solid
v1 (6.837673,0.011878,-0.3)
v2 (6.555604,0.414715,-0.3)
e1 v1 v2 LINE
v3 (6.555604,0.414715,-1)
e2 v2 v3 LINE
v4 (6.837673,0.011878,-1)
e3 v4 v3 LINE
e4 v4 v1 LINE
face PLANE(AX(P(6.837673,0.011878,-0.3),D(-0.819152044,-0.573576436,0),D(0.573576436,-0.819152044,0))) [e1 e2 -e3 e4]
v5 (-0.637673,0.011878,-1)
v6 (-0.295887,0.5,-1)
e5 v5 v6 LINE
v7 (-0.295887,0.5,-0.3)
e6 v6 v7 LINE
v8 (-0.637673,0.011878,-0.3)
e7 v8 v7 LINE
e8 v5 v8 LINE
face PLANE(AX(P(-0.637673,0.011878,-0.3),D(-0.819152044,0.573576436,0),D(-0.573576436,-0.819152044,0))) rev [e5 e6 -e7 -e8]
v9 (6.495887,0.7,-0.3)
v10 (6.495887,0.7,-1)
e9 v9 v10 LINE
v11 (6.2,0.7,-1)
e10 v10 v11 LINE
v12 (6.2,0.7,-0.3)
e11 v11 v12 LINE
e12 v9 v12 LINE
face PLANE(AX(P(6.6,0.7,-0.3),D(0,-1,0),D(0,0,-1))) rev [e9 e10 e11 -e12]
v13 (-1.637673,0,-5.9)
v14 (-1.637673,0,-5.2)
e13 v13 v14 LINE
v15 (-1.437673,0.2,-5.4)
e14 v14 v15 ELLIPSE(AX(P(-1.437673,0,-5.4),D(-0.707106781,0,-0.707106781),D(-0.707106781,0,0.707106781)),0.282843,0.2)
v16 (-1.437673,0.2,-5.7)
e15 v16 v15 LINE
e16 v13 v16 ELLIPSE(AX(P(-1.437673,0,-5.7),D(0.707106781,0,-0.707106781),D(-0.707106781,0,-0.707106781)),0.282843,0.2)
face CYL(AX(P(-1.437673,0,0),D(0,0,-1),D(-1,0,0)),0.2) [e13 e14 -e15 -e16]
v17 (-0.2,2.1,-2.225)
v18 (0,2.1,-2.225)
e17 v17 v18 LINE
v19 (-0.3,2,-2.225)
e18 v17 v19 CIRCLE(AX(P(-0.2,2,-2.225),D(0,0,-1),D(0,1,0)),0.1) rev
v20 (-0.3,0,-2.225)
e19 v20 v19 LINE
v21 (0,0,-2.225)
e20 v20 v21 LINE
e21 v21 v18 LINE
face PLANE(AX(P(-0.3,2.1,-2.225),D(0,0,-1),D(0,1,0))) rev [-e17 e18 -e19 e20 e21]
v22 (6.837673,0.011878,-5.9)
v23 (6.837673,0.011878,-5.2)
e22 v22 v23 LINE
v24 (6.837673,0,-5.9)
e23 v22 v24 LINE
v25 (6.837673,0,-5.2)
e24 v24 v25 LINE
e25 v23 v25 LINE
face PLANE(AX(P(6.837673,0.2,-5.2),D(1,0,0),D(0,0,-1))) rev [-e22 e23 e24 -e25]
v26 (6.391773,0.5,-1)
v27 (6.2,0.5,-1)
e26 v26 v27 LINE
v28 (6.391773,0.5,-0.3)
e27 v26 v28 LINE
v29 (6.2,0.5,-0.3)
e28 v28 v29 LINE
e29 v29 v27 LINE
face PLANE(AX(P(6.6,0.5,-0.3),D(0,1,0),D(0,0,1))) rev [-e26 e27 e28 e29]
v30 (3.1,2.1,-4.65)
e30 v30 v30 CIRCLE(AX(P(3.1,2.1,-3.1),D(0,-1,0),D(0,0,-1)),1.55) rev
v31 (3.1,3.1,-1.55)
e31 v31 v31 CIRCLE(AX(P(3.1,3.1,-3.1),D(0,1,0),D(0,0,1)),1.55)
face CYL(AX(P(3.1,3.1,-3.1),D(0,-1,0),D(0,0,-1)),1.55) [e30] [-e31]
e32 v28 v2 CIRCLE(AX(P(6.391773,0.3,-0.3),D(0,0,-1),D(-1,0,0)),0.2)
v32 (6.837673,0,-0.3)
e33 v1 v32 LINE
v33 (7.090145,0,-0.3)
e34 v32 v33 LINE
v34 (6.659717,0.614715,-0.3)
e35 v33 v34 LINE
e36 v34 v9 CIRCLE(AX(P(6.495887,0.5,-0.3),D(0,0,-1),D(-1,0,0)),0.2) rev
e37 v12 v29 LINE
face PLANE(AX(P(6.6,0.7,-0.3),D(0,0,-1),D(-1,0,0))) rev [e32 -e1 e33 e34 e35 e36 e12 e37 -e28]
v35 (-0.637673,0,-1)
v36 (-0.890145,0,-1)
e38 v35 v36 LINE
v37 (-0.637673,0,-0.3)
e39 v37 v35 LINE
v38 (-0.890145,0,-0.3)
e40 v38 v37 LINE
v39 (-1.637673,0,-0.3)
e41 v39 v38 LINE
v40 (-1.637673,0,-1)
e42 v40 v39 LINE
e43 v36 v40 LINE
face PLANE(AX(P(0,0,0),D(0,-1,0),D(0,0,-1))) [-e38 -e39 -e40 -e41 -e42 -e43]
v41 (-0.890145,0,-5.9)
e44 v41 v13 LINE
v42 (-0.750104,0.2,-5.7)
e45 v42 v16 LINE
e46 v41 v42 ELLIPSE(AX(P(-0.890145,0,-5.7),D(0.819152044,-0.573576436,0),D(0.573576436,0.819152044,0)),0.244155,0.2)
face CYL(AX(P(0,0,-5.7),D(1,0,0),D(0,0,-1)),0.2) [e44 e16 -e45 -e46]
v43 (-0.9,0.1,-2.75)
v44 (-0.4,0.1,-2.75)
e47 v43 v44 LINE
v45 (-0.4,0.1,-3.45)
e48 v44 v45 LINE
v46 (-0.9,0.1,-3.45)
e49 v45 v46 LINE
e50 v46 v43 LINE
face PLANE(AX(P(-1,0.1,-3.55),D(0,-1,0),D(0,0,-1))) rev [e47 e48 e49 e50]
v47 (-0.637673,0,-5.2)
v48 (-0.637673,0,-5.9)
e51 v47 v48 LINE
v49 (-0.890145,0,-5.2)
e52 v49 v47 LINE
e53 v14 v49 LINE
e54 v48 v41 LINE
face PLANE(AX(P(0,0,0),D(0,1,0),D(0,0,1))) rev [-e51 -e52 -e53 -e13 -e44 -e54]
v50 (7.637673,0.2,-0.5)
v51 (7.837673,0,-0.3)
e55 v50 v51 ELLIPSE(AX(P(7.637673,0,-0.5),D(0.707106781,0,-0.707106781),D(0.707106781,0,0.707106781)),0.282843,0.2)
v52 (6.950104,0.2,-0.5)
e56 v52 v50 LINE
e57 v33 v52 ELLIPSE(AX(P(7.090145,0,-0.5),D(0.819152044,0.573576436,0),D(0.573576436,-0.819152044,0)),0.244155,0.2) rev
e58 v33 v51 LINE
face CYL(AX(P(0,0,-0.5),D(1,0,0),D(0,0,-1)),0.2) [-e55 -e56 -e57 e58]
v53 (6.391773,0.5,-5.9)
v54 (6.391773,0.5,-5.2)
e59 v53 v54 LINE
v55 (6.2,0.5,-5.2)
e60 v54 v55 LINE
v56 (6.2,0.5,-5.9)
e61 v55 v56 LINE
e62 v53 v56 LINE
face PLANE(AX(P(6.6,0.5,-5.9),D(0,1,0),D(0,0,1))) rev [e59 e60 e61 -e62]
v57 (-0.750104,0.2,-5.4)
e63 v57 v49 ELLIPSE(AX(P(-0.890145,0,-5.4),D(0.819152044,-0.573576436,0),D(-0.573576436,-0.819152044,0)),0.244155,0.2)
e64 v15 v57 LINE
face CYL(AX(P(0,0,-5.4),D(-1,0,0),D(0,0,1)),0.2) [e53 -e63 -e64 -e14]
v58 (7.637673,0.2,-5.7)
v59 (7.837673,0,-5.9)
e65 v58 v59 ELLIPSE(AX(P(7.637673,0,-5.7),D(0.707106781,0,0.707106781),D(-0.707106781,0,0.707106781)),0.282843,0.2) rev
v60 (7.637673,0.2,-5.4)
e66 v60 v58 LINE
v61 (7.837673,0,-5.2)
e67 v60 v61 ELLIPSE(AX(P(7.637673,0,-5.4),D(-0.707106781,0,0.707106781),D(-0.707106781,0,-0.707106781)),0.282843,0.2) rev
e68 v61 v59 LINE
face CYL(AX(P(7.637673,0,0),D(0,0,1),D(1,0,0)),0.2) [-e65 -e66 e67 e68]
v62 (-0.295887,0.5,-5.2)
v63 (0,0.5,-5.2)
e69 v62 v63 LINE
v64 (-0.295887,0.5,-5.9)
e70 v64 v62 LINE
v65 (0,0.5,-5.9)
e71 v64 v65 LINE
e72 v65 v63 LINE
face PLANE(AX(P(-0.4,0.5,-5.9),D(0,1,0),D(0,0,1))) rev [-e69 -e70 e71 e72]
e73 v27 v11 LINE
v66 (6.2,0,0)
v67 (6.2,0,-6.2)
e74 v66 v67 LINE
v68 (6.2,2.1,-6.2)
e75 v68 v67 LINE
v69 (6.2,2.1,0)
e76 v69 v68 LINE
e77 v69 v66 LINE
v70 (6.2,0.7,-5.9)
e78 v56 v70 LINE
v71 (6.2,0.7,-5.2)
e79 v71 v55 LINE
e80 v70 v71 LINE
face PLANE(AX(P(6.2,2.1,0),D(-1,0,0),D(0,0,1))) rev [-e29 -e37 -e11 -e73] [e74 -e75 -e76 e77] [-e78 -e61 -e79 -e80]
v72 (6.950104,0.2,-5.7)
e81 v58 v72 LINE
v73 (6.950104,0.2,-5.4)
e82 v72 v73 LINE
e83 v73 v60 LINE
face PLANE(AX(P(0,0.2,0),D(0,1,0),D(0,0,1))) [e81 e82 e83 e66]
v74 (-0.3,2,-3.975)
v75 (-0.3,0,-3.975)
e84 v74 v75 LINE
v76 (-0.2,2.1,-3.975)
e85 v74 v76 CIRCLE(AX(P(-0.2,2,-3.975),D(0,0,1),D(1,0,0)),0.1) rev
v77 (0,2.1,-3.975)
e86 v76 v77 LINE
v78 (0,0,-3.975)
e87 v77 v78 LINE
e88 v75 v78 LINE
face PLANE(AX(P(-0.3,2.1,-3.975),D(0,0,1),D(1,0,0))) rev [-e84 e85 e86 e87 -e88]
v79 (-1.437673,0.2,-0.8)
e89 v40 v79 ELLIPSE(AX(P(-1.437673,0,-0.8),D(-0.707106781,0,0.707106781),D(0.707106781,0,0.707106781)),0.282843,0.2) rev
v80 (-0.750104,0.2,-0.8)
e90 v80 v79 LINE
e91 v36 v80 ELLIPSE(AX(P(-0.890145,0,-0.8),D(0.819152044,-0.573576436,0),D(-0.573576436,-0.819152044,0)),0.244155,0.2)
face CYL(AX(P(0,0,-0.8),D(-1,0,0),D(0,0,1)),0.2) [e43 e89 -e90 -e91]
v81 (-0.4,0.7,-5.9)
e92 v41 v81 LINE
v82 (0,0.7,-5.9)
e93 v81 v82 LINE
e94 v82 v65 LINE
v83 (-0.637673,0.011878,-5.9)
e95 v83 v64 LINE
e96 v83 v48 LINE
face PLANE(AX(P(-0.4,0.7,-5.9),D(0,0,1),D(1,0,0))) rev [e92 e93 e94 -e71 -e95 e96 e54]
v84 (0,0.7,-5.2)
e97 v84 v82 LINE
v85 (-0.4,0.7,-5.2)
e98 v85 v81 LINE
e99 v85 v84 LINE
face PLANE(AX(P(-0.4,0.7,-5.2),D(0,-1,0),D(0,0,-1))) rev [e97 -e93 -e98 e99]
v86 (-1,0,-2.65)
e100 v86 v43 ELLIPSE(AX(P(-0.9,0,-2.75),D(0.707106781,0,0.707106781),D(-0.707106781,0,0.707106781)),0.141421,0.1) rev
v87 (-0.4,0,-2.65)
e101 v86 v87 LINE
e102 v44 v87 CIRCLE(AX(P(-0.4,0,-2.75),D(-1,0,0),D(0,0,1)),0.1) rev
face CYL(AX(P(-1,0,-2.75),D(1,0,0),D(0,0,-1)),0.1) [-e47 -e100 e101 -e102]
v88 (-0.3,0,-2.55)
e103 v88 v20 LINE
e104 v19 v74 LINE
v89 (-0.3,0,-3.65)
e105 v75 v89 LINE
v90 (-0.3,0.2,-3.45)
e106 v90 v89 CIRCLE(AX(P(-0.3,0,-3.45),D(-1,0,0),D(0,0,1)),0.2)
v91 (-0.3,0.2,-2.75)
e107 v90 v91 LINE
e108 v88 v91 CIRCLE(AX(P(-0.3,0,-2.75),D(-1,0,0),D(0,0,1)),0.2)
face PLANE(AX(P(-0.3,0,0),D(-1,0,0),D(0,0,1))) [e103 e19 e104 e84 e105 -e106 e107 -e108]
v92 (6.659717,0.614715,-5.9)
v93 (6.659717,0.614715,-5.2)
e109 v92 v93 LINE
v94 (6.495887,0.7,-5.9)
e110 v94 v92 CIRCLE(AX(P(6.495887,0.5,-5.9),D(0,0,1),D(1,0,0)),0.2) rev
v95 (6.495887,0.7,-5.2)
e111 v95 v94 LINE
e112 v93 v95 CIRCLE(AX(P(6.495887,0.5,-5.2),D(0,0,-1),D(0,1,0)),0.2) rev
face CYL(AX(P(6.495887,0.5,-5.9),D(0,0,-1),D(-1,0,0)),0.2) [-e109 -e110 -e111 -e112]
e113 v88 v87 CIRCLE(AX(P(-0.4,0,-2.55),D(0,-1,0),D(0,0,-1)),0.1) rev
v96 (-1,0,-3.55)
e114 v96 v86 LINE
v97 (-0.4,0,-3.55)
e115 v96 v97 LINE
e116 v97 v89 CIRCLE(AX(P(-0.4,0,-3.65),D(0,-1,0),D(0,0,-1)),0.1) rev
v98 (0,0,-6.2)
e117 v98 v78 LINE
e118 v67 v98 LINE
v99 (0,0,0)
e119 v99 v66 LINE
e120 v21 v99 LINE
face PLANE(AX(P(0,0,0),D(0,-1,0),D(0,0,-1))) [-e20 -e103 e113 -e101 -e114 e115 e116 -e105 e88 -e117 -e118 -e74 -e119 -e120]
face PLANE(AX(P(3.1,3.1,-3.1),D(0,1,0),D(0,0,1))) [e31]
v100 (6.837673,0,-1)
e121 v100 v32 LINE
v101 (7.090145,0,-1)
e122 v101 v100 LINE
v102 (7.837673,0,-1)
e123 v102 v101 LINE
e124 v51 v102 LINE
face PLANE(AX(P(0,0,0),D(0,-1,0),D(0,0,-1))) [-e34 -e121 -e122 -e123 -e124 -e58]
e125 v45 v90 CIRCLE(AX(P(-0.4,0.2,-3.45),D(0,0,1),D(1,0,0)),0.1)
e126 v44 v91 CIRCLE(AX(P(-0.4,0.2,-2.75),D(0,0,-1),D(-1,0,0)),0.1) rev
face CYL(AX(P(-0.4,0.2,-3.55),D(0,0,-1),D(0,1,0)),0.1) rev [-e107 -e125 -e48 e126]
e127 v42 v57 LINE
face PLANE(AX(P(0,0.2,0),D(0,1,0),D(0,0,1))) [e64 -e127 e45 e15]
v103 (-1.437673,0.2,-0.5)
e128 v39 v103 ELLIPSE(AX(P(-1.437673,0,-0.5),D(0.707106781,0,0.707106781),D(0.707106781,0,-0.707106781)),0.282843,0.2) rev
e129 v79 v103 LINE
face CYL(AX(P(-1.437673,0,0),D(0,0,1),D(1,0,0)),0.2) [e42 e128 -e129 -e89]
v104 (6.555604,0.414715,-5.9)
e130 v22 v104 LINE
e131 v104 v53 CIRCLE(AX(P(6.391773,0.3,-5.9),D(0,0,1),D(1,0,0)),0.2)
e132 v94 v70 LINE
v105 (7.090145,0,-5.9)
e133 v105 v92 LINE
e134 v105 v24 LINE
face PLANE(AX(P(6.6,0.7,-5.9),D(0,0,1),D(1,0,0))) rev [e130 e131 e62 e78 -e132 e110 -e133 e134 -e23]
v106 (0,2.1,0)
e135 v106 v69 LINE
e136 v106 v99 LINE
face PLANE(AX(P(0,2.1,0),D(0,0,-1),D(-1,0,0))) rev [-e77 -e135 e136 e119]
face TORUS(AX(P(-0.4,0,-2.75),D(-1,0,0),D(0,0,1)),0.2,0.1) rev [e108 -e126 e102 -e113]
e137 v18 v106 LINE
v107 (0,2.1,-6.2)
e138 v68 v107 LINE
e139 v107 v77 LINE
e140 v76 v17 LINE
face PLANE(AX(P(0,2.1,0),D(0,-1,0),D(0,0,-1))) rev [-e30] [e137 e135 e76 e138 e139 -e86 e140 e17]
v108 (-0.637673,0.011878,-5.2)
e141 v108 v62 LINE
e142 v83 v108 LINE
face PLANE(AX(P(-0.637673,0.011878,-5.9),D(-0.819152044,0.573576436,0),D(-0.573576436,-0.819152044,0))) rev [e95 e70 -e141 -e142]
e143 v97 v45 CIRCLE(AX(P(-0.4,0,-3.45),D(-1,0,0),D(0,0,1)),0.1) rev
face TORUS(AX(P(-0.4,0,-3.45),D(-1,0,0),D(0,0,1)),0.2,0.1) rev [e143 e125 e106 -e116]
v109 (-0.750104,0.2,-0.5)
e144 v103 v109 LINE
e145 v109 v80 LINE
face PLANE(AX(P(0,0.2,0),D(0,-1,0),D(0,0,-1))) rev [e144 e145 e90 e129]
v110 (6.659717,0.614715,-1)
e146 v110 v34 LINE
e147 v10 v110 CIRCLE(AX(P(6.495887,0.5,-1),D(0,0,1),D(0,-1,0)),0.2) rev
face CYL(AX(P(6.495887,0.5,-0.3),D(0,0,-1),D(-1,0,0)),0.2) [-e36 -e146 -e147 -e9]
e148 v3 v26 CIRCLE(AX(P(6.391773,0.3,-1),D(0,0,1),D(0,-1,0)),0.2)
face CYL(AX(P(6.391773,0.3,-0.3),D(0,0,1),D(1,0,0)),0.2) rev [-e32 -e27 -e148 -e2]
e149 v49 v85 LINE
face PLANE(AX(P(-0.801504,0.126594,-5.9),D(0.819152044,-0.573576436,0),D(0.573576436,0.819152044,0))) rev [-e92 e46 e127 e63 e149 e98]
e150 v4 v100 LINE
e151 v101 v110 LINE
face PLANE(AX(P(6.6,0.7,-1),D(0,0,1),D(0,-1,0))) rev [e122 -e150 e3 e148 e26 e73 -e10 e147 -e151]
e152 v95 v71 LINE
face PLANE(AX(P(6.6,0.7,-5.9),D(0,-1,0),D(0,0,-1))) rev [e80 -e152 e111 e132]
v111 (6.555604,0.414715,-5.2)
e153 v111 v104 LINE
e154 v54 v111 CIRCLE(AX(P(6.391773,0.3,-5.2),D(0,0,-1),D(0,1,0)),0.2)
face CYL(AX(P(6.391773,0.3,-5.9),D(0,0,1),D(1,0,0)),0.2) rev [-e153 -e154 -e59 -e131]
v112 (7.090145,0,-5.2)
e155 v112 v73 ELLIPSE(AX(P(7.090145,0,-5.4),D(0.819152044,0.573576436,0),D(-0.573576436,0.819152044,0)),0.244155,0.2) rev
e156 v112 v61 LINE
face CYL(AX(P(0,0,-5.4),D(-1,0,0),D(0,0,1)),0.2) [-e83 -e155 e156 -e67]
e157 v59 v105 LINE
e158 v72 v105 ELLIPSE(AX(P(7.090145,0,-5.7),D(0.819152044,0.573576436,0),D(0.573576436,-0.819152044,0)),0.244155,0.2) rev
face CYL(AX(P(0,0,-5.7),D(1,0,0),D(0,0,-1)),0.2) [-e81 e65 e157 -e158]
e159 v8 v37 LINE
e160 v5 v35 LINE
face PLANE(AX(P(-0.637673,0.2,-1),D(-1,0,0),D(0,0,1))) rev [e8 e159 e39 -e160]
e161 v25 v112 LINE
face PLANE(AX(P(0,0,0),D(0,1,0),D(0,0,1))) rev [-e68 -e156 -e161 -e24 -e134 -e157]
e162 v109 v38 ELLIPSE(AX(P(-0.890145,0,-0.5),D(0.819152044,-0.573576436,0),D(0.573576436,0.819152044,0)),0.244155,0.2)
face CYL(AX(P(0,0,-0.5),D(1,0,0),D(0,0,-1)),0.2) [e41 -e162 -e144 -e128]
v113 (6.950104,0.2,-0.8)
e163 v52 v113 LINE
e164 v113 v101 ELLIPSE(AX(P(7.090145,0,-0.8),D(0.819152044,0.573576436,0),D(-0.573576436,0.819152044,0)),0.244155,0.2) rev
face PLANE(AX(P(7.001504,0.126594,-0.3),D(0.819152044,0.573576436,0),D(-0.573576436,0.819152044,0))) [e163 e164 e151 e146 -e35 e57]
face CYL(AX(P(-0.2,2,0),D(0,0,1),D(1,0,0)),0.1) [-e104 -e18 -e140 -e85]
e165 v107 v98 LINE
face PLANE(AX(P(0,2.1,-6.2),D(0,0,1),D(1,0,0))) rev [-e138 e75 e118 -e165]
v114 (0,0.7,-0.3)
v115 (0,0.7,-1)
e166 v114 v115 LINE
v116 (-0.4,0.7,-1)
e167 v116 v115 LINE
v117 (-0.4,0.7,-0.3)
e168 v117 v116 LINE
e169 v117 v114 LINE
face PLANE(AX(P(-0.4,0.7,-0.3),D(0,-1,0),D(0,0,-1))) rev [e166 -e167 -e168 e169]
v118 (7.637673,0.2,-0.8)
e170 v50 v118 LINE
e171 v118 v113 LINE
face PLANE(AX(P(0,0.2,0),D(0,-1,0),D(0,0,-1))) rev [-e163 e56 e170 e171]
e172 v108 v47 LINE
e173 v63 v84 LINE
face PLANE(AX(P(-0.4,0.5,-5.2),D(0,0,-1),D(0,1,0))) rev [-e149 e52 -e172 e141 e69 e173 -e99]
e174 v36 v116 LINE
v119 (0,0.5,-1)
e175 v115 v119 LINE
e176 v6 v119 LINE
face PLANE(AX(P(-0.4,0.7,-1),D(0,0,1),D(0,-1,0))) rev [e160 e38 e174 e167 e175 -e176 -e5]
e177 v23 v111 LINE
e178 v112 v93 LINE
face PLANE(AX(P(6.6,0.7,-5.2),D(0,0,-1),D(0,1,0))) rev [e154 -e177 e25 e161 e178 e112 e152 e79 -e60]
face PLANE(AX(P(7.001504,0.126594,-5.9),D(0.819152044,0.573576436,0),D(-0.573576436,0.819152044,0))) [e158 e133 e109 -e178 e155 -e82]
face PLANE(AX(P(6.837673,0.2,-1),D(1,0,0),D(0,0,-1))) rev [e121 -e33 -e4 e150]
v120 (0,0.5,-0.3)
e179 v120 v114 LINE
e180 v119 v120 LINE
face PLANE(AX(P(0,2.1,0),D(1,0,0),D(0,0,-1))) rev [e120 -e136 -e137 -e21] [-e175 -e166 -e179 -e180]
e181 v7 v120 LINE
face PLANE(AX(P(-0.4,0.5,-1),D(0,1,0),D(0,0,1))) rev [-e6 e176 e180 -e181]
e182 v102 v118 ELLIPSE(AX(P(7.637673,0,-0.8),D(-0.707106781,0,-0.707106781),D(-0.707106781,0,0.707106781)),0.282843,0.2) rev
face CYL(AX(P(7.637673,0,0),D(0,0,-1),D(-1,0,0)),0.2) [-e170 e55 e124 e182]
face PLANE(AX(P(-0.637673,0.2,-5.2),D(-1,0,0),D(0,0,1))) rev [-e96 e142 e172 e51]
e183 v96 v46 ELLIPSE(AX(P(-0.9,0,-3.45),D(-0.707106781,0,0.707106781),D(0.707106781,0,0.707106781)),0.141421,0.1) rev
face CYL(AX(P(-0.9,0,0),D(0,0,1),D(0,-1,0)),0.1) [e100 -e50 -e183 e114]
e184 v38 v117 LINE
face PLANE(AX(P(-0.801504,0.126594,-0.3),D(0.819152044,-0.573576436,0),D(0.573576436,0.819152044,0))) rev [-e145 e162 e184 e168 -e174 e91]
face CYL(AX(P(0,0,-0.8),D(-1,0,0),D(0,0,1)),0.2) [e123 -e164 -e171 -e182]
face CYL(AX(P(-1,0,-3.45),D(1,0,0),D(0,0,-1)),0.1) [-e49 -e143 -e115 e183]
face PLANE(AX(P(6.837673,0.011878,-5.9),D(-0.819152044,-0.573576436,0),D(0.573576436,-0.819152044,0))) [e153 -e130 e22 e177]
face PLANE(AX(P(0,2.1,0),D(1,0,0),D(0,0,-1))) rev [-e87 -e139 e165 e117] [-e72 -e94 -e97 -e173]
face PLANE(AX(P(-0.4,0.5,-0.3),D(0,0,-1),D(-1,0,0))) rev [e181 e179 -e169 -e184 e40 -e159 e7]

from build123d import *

# Parameters (mm, degrees)
ESQUISSE1_W         = 6.2
ESQUISSE1_H         = 6.2
BOSS_EXTRU_1_DEPTH  = 2.1
ESQUISSE2_R         = 1.55
BOSS_EXTRU_2_DEPTH  = 1
ESQUISSE3_W         = 1.75
ESQUISSE3_H         = 2.1
BOSS_EXTRU_3_DEPTH  = 0.3
ESQUISSE4_W         = 0.9
ESQUISSE4_H         = 0.1
BOSS_EXTRU_4_DEPTH  = 0.7
CONG_1_R            = 0.1
ESQUISSE5_W         = 0.7
ESQUISSE5_H         = 0.2
BOSS_EXTRU_5_DEPTH  = 0.4
ESQUISSE7_W         = 0.7
ESQUISSE7_H         = 0.2
BOSS_EXTRU_6_DEPTH  = 0.7
CONG_2_R            = 0.2
ESQUISSE9_W         = 1
ESQUISSE9_H         = 0.7
BOSS_EXTRU_7_DEPTH  = 0.2
CONG_3_R            = 0.2
CONG_4_R            = 0.2
ESQUISSE10_W        = 0.7
ESQUISSE10_H        = 0.2
BOSS_EXTRU_10_DEPTH = 0.4
ESQUISSE14_W        = 0.7
ESQUISSE14_H        = 0.2
BOSS_EXTRU_11_DEPTH = 0.7
ESQUISSE16_W        = 1
ESQUISSE16_H        = 0.7
BOSS_EXTRU_12_DEPTH = 0.2
CONG_5_R            = 0.2


with BuildPart() as part:
    # Esquisse1 → Boss.-Extru.1 (new body)
    with BuildSketch(Plane(origin=(0, 0, 0), x_dir=(1, 0, 0), z_dir=(0, 1, 0))):
        with Locations((3.1, 3.1)):
            Rectangle(ESQUISSE1_W, ESQUISSE1_H)
    extrude(amount=BOSS_EXTRU_1_DEPTH)

    # Esquisse2 → Boss.-Extru.2 (add)
    with BuildSketch(Plane(origin=(0, 2.1, 0), x_dir=(1, 0, 0), z_dir=(0, 1, 0))):
        with Locations(Location((3.1, 3.1, 0), (0, 0, 90))):
            Circle(ESQUISSE2_R)
    extrude(amount=BOSS_EXTRU_2_DEPTH)

    # Esquisse3 → Boss.-Extru.3 (add)
    with BuildSketch(Plane.ZY):
        with Locations((-3.1, 1.05)):
            Rectangle(ESQUISSE3_W, ESQUISSE3_H)
    extrude(amount=BOSS_EXTRU_3_DEPTH)

    # Esquisse4 → Boss.-Extru.4 (add)
    with BuildSketch(Plane.ZY.offset(0.3)):
        with Locations((-3.1, 0.05)):
            Rectangle(ESQUISSE4_W, ESQUISSE4_H)
    extrude(amount=BOSS_EXTRU_4_DEPTH)

    # Congé1
    cong_1_edges = [part.edges().sort_by_distance(p)[0] for p in [
        (-0.65, 0.1, -3.55),
        (-0.65, 0.1, -2.65),
        (-1, 0.1, -3.1),
        (-0.3, 2.1, -3.1),
    ]]
    fillet(cong_1_edges, radius=CONG_1_R - 0.0001)  # a hair under: the kernel refuses the full size
    cong_1_2_edges = [part.edges().sort_by_distance(p)[0] for p in [
        (-0.3, 0.1, -3.1),
        (-0.3, 0.070739967, -3.520739967),
        (-0.3, 0.070739967, -2.679260033),
    ]]
    fillet(cong_1_2_edges, radius=CONG_1_R)

    # Esquisse5 → Boss.-Extru.5 (add)
    with BuildSketch(Plane(origin=(6.2, 0, 0), x_dir=(0, 0, -1), z_dir=(1, 0, 0))):
        with Locations((0.65, 0.6)):
            Rectangle(ESQUISSE5_W, ESQUISSE5_H)
        with Locations((5.55, 0.6)):
            Rectangle(ESQUISSE5_W, ESQUISSE5_H)
    extrude(amount=BOSS_EXTRU_5_DEPTH)

    # Esquisse7 → Boss.-Extru.6 (add)
    with BuildSketch(Plane(origin=(1.84244111, -2.631278598, 0), x_dir=(0, 0, -1), z_dir=(-0.5735764363510502, 0.8191520442889889, 0))):
        with Locations((5.55, -5.707906998)):
            Rectangle(ESQUISSE7_W, ESQUISSE7_H)
        with Locations((0.65, -5.707906998)):
            Rectangle(ESQUISSE7_W, ESQUISSE7_H)
    extrude(amount=-BOSS_EXTRU_6_DEPTH)

    # Congé2
    cong_2_edges = [part.edges().sort_by_distance(p)[0] for p in [
        (6.49588659, 0.5, -5.55),
        (6.49588659, 0.5, -0.65),
        (6.6, 0.7, -0.65),
        (6.6, 0.7, -5.55),
    ]]
    fillet(cong_2_edges, radius=CONG_2_R)

    # Esquisse9 → Boss.-Extru.7 (add)
    with BuildSketch(Plane(origin=(0, 0, 0), x_dir=(1, 0, 0), z_dir=(0, 1, 0))):
        with Locations((7.337673097, 0.65)):
            Rectangle(ESQUISSE9_W, ESQUISSE9_H)
        with Locations((7.337673097, 5.55)):
            Rectangle(ESQUISSE9_W, ESQUISSE9_H)
    extrude(amount=BOSS_EXTRU_7_DEPTH)

    # Congé3
    cong_3_edges = [part.edges().sort_by_distance(p)[0] for p in [
        (7.837673097, 0.2, -0.65),
        (7.393888433, 0.2, -1),
        (7.393888433, 0.2, -0.3),
    ]]
    fillet(cong_3_edges, radius=CONG_3_R - 0.0001)  # a hair under: the kernel refuses the full size

    # Congé4
    cong_4_edges = [part.edges().sort_by_distance(p)[0] for p in [
        (7.393888433, 0.2, -5.9),
        (7.837673097, 0.2, -5.55),
        (7.393888433, 0.2, -5.2),
    ]]
    fillet(cong_4_edges, radius=CONG_4_R - 0.0001)  # a hair under: the kernel refuses the full size

    # Esquisse10 → Boss.-Extru.10 (add)
    with BuildSketch(Plane.ZY):
        with Locations((-5.55, 0.6)):
            Rectangle(ESQUISSE10_W, ESQUISSE10_H)
        with Locations((-0.65, 0.6)):
            Rectangle(ESQUISSE10_W, ESQUISSE10_H)
    extrude(amount=BOSS_EXTRU_10_DEPTH)

    # Esquisse14 → Boss.-Extru.11 (add)
    with BuildSketch(Plane(origin=(0.197296446, 0.281768526, 0), x_dir=(0, 0, -1), z_dir=(-0.5735764363510527, -0.8191520442889871, 0))):
        with Locations((0.65, -0.629164323)):
            Rectangle(ESQUISSE14_W, ESQUISSE14_H)
        with Locations((5.55, -0.629164323)):
            Rectangle(ESQUISSE14_W, ESQUISSE14_H)
    extrude(amount=BOSS_EXTRU_11_DEPTH)

    # Esquisse16 → Boss.-Extru.12 (add)
    with BuildSketch(Plane(origin=(0, 0, 0), x_dir=(1, 0, 0), z_dir=(0, 1, 0))):
        with Locations((-1.137673097, 0.65)):
            Rectangle(ESQUISSE16_W, ESQUISSE16_H)
        with Locations((-1.137673097, 5.55)):
            Rectangle(ESQUISSE16_W, ESQUISSE16_H)
    extrude(amount=BOSS_EXTRU_12_DEPTH)

    # Congé5
    cong_5_edges = [part.edges().sort_by_distance(p)[0] for p in [
        (-1.193888433, 0.2, -5.9),
        (-1.637673097, 0.2, -5.55),
        (-1.193888433, 0.2, -5.2),
        (-1.193888433, 0.2, -1),
        (-1.637673097, 0.2, -0.65),
        (-1.193888433, 0.2, -0.3),
    ]]
    fillet(cong_5_edges, radius=CONG_5_R - 0.0001)  # a hair under: the kernel refuses the full size


solid = part.part
